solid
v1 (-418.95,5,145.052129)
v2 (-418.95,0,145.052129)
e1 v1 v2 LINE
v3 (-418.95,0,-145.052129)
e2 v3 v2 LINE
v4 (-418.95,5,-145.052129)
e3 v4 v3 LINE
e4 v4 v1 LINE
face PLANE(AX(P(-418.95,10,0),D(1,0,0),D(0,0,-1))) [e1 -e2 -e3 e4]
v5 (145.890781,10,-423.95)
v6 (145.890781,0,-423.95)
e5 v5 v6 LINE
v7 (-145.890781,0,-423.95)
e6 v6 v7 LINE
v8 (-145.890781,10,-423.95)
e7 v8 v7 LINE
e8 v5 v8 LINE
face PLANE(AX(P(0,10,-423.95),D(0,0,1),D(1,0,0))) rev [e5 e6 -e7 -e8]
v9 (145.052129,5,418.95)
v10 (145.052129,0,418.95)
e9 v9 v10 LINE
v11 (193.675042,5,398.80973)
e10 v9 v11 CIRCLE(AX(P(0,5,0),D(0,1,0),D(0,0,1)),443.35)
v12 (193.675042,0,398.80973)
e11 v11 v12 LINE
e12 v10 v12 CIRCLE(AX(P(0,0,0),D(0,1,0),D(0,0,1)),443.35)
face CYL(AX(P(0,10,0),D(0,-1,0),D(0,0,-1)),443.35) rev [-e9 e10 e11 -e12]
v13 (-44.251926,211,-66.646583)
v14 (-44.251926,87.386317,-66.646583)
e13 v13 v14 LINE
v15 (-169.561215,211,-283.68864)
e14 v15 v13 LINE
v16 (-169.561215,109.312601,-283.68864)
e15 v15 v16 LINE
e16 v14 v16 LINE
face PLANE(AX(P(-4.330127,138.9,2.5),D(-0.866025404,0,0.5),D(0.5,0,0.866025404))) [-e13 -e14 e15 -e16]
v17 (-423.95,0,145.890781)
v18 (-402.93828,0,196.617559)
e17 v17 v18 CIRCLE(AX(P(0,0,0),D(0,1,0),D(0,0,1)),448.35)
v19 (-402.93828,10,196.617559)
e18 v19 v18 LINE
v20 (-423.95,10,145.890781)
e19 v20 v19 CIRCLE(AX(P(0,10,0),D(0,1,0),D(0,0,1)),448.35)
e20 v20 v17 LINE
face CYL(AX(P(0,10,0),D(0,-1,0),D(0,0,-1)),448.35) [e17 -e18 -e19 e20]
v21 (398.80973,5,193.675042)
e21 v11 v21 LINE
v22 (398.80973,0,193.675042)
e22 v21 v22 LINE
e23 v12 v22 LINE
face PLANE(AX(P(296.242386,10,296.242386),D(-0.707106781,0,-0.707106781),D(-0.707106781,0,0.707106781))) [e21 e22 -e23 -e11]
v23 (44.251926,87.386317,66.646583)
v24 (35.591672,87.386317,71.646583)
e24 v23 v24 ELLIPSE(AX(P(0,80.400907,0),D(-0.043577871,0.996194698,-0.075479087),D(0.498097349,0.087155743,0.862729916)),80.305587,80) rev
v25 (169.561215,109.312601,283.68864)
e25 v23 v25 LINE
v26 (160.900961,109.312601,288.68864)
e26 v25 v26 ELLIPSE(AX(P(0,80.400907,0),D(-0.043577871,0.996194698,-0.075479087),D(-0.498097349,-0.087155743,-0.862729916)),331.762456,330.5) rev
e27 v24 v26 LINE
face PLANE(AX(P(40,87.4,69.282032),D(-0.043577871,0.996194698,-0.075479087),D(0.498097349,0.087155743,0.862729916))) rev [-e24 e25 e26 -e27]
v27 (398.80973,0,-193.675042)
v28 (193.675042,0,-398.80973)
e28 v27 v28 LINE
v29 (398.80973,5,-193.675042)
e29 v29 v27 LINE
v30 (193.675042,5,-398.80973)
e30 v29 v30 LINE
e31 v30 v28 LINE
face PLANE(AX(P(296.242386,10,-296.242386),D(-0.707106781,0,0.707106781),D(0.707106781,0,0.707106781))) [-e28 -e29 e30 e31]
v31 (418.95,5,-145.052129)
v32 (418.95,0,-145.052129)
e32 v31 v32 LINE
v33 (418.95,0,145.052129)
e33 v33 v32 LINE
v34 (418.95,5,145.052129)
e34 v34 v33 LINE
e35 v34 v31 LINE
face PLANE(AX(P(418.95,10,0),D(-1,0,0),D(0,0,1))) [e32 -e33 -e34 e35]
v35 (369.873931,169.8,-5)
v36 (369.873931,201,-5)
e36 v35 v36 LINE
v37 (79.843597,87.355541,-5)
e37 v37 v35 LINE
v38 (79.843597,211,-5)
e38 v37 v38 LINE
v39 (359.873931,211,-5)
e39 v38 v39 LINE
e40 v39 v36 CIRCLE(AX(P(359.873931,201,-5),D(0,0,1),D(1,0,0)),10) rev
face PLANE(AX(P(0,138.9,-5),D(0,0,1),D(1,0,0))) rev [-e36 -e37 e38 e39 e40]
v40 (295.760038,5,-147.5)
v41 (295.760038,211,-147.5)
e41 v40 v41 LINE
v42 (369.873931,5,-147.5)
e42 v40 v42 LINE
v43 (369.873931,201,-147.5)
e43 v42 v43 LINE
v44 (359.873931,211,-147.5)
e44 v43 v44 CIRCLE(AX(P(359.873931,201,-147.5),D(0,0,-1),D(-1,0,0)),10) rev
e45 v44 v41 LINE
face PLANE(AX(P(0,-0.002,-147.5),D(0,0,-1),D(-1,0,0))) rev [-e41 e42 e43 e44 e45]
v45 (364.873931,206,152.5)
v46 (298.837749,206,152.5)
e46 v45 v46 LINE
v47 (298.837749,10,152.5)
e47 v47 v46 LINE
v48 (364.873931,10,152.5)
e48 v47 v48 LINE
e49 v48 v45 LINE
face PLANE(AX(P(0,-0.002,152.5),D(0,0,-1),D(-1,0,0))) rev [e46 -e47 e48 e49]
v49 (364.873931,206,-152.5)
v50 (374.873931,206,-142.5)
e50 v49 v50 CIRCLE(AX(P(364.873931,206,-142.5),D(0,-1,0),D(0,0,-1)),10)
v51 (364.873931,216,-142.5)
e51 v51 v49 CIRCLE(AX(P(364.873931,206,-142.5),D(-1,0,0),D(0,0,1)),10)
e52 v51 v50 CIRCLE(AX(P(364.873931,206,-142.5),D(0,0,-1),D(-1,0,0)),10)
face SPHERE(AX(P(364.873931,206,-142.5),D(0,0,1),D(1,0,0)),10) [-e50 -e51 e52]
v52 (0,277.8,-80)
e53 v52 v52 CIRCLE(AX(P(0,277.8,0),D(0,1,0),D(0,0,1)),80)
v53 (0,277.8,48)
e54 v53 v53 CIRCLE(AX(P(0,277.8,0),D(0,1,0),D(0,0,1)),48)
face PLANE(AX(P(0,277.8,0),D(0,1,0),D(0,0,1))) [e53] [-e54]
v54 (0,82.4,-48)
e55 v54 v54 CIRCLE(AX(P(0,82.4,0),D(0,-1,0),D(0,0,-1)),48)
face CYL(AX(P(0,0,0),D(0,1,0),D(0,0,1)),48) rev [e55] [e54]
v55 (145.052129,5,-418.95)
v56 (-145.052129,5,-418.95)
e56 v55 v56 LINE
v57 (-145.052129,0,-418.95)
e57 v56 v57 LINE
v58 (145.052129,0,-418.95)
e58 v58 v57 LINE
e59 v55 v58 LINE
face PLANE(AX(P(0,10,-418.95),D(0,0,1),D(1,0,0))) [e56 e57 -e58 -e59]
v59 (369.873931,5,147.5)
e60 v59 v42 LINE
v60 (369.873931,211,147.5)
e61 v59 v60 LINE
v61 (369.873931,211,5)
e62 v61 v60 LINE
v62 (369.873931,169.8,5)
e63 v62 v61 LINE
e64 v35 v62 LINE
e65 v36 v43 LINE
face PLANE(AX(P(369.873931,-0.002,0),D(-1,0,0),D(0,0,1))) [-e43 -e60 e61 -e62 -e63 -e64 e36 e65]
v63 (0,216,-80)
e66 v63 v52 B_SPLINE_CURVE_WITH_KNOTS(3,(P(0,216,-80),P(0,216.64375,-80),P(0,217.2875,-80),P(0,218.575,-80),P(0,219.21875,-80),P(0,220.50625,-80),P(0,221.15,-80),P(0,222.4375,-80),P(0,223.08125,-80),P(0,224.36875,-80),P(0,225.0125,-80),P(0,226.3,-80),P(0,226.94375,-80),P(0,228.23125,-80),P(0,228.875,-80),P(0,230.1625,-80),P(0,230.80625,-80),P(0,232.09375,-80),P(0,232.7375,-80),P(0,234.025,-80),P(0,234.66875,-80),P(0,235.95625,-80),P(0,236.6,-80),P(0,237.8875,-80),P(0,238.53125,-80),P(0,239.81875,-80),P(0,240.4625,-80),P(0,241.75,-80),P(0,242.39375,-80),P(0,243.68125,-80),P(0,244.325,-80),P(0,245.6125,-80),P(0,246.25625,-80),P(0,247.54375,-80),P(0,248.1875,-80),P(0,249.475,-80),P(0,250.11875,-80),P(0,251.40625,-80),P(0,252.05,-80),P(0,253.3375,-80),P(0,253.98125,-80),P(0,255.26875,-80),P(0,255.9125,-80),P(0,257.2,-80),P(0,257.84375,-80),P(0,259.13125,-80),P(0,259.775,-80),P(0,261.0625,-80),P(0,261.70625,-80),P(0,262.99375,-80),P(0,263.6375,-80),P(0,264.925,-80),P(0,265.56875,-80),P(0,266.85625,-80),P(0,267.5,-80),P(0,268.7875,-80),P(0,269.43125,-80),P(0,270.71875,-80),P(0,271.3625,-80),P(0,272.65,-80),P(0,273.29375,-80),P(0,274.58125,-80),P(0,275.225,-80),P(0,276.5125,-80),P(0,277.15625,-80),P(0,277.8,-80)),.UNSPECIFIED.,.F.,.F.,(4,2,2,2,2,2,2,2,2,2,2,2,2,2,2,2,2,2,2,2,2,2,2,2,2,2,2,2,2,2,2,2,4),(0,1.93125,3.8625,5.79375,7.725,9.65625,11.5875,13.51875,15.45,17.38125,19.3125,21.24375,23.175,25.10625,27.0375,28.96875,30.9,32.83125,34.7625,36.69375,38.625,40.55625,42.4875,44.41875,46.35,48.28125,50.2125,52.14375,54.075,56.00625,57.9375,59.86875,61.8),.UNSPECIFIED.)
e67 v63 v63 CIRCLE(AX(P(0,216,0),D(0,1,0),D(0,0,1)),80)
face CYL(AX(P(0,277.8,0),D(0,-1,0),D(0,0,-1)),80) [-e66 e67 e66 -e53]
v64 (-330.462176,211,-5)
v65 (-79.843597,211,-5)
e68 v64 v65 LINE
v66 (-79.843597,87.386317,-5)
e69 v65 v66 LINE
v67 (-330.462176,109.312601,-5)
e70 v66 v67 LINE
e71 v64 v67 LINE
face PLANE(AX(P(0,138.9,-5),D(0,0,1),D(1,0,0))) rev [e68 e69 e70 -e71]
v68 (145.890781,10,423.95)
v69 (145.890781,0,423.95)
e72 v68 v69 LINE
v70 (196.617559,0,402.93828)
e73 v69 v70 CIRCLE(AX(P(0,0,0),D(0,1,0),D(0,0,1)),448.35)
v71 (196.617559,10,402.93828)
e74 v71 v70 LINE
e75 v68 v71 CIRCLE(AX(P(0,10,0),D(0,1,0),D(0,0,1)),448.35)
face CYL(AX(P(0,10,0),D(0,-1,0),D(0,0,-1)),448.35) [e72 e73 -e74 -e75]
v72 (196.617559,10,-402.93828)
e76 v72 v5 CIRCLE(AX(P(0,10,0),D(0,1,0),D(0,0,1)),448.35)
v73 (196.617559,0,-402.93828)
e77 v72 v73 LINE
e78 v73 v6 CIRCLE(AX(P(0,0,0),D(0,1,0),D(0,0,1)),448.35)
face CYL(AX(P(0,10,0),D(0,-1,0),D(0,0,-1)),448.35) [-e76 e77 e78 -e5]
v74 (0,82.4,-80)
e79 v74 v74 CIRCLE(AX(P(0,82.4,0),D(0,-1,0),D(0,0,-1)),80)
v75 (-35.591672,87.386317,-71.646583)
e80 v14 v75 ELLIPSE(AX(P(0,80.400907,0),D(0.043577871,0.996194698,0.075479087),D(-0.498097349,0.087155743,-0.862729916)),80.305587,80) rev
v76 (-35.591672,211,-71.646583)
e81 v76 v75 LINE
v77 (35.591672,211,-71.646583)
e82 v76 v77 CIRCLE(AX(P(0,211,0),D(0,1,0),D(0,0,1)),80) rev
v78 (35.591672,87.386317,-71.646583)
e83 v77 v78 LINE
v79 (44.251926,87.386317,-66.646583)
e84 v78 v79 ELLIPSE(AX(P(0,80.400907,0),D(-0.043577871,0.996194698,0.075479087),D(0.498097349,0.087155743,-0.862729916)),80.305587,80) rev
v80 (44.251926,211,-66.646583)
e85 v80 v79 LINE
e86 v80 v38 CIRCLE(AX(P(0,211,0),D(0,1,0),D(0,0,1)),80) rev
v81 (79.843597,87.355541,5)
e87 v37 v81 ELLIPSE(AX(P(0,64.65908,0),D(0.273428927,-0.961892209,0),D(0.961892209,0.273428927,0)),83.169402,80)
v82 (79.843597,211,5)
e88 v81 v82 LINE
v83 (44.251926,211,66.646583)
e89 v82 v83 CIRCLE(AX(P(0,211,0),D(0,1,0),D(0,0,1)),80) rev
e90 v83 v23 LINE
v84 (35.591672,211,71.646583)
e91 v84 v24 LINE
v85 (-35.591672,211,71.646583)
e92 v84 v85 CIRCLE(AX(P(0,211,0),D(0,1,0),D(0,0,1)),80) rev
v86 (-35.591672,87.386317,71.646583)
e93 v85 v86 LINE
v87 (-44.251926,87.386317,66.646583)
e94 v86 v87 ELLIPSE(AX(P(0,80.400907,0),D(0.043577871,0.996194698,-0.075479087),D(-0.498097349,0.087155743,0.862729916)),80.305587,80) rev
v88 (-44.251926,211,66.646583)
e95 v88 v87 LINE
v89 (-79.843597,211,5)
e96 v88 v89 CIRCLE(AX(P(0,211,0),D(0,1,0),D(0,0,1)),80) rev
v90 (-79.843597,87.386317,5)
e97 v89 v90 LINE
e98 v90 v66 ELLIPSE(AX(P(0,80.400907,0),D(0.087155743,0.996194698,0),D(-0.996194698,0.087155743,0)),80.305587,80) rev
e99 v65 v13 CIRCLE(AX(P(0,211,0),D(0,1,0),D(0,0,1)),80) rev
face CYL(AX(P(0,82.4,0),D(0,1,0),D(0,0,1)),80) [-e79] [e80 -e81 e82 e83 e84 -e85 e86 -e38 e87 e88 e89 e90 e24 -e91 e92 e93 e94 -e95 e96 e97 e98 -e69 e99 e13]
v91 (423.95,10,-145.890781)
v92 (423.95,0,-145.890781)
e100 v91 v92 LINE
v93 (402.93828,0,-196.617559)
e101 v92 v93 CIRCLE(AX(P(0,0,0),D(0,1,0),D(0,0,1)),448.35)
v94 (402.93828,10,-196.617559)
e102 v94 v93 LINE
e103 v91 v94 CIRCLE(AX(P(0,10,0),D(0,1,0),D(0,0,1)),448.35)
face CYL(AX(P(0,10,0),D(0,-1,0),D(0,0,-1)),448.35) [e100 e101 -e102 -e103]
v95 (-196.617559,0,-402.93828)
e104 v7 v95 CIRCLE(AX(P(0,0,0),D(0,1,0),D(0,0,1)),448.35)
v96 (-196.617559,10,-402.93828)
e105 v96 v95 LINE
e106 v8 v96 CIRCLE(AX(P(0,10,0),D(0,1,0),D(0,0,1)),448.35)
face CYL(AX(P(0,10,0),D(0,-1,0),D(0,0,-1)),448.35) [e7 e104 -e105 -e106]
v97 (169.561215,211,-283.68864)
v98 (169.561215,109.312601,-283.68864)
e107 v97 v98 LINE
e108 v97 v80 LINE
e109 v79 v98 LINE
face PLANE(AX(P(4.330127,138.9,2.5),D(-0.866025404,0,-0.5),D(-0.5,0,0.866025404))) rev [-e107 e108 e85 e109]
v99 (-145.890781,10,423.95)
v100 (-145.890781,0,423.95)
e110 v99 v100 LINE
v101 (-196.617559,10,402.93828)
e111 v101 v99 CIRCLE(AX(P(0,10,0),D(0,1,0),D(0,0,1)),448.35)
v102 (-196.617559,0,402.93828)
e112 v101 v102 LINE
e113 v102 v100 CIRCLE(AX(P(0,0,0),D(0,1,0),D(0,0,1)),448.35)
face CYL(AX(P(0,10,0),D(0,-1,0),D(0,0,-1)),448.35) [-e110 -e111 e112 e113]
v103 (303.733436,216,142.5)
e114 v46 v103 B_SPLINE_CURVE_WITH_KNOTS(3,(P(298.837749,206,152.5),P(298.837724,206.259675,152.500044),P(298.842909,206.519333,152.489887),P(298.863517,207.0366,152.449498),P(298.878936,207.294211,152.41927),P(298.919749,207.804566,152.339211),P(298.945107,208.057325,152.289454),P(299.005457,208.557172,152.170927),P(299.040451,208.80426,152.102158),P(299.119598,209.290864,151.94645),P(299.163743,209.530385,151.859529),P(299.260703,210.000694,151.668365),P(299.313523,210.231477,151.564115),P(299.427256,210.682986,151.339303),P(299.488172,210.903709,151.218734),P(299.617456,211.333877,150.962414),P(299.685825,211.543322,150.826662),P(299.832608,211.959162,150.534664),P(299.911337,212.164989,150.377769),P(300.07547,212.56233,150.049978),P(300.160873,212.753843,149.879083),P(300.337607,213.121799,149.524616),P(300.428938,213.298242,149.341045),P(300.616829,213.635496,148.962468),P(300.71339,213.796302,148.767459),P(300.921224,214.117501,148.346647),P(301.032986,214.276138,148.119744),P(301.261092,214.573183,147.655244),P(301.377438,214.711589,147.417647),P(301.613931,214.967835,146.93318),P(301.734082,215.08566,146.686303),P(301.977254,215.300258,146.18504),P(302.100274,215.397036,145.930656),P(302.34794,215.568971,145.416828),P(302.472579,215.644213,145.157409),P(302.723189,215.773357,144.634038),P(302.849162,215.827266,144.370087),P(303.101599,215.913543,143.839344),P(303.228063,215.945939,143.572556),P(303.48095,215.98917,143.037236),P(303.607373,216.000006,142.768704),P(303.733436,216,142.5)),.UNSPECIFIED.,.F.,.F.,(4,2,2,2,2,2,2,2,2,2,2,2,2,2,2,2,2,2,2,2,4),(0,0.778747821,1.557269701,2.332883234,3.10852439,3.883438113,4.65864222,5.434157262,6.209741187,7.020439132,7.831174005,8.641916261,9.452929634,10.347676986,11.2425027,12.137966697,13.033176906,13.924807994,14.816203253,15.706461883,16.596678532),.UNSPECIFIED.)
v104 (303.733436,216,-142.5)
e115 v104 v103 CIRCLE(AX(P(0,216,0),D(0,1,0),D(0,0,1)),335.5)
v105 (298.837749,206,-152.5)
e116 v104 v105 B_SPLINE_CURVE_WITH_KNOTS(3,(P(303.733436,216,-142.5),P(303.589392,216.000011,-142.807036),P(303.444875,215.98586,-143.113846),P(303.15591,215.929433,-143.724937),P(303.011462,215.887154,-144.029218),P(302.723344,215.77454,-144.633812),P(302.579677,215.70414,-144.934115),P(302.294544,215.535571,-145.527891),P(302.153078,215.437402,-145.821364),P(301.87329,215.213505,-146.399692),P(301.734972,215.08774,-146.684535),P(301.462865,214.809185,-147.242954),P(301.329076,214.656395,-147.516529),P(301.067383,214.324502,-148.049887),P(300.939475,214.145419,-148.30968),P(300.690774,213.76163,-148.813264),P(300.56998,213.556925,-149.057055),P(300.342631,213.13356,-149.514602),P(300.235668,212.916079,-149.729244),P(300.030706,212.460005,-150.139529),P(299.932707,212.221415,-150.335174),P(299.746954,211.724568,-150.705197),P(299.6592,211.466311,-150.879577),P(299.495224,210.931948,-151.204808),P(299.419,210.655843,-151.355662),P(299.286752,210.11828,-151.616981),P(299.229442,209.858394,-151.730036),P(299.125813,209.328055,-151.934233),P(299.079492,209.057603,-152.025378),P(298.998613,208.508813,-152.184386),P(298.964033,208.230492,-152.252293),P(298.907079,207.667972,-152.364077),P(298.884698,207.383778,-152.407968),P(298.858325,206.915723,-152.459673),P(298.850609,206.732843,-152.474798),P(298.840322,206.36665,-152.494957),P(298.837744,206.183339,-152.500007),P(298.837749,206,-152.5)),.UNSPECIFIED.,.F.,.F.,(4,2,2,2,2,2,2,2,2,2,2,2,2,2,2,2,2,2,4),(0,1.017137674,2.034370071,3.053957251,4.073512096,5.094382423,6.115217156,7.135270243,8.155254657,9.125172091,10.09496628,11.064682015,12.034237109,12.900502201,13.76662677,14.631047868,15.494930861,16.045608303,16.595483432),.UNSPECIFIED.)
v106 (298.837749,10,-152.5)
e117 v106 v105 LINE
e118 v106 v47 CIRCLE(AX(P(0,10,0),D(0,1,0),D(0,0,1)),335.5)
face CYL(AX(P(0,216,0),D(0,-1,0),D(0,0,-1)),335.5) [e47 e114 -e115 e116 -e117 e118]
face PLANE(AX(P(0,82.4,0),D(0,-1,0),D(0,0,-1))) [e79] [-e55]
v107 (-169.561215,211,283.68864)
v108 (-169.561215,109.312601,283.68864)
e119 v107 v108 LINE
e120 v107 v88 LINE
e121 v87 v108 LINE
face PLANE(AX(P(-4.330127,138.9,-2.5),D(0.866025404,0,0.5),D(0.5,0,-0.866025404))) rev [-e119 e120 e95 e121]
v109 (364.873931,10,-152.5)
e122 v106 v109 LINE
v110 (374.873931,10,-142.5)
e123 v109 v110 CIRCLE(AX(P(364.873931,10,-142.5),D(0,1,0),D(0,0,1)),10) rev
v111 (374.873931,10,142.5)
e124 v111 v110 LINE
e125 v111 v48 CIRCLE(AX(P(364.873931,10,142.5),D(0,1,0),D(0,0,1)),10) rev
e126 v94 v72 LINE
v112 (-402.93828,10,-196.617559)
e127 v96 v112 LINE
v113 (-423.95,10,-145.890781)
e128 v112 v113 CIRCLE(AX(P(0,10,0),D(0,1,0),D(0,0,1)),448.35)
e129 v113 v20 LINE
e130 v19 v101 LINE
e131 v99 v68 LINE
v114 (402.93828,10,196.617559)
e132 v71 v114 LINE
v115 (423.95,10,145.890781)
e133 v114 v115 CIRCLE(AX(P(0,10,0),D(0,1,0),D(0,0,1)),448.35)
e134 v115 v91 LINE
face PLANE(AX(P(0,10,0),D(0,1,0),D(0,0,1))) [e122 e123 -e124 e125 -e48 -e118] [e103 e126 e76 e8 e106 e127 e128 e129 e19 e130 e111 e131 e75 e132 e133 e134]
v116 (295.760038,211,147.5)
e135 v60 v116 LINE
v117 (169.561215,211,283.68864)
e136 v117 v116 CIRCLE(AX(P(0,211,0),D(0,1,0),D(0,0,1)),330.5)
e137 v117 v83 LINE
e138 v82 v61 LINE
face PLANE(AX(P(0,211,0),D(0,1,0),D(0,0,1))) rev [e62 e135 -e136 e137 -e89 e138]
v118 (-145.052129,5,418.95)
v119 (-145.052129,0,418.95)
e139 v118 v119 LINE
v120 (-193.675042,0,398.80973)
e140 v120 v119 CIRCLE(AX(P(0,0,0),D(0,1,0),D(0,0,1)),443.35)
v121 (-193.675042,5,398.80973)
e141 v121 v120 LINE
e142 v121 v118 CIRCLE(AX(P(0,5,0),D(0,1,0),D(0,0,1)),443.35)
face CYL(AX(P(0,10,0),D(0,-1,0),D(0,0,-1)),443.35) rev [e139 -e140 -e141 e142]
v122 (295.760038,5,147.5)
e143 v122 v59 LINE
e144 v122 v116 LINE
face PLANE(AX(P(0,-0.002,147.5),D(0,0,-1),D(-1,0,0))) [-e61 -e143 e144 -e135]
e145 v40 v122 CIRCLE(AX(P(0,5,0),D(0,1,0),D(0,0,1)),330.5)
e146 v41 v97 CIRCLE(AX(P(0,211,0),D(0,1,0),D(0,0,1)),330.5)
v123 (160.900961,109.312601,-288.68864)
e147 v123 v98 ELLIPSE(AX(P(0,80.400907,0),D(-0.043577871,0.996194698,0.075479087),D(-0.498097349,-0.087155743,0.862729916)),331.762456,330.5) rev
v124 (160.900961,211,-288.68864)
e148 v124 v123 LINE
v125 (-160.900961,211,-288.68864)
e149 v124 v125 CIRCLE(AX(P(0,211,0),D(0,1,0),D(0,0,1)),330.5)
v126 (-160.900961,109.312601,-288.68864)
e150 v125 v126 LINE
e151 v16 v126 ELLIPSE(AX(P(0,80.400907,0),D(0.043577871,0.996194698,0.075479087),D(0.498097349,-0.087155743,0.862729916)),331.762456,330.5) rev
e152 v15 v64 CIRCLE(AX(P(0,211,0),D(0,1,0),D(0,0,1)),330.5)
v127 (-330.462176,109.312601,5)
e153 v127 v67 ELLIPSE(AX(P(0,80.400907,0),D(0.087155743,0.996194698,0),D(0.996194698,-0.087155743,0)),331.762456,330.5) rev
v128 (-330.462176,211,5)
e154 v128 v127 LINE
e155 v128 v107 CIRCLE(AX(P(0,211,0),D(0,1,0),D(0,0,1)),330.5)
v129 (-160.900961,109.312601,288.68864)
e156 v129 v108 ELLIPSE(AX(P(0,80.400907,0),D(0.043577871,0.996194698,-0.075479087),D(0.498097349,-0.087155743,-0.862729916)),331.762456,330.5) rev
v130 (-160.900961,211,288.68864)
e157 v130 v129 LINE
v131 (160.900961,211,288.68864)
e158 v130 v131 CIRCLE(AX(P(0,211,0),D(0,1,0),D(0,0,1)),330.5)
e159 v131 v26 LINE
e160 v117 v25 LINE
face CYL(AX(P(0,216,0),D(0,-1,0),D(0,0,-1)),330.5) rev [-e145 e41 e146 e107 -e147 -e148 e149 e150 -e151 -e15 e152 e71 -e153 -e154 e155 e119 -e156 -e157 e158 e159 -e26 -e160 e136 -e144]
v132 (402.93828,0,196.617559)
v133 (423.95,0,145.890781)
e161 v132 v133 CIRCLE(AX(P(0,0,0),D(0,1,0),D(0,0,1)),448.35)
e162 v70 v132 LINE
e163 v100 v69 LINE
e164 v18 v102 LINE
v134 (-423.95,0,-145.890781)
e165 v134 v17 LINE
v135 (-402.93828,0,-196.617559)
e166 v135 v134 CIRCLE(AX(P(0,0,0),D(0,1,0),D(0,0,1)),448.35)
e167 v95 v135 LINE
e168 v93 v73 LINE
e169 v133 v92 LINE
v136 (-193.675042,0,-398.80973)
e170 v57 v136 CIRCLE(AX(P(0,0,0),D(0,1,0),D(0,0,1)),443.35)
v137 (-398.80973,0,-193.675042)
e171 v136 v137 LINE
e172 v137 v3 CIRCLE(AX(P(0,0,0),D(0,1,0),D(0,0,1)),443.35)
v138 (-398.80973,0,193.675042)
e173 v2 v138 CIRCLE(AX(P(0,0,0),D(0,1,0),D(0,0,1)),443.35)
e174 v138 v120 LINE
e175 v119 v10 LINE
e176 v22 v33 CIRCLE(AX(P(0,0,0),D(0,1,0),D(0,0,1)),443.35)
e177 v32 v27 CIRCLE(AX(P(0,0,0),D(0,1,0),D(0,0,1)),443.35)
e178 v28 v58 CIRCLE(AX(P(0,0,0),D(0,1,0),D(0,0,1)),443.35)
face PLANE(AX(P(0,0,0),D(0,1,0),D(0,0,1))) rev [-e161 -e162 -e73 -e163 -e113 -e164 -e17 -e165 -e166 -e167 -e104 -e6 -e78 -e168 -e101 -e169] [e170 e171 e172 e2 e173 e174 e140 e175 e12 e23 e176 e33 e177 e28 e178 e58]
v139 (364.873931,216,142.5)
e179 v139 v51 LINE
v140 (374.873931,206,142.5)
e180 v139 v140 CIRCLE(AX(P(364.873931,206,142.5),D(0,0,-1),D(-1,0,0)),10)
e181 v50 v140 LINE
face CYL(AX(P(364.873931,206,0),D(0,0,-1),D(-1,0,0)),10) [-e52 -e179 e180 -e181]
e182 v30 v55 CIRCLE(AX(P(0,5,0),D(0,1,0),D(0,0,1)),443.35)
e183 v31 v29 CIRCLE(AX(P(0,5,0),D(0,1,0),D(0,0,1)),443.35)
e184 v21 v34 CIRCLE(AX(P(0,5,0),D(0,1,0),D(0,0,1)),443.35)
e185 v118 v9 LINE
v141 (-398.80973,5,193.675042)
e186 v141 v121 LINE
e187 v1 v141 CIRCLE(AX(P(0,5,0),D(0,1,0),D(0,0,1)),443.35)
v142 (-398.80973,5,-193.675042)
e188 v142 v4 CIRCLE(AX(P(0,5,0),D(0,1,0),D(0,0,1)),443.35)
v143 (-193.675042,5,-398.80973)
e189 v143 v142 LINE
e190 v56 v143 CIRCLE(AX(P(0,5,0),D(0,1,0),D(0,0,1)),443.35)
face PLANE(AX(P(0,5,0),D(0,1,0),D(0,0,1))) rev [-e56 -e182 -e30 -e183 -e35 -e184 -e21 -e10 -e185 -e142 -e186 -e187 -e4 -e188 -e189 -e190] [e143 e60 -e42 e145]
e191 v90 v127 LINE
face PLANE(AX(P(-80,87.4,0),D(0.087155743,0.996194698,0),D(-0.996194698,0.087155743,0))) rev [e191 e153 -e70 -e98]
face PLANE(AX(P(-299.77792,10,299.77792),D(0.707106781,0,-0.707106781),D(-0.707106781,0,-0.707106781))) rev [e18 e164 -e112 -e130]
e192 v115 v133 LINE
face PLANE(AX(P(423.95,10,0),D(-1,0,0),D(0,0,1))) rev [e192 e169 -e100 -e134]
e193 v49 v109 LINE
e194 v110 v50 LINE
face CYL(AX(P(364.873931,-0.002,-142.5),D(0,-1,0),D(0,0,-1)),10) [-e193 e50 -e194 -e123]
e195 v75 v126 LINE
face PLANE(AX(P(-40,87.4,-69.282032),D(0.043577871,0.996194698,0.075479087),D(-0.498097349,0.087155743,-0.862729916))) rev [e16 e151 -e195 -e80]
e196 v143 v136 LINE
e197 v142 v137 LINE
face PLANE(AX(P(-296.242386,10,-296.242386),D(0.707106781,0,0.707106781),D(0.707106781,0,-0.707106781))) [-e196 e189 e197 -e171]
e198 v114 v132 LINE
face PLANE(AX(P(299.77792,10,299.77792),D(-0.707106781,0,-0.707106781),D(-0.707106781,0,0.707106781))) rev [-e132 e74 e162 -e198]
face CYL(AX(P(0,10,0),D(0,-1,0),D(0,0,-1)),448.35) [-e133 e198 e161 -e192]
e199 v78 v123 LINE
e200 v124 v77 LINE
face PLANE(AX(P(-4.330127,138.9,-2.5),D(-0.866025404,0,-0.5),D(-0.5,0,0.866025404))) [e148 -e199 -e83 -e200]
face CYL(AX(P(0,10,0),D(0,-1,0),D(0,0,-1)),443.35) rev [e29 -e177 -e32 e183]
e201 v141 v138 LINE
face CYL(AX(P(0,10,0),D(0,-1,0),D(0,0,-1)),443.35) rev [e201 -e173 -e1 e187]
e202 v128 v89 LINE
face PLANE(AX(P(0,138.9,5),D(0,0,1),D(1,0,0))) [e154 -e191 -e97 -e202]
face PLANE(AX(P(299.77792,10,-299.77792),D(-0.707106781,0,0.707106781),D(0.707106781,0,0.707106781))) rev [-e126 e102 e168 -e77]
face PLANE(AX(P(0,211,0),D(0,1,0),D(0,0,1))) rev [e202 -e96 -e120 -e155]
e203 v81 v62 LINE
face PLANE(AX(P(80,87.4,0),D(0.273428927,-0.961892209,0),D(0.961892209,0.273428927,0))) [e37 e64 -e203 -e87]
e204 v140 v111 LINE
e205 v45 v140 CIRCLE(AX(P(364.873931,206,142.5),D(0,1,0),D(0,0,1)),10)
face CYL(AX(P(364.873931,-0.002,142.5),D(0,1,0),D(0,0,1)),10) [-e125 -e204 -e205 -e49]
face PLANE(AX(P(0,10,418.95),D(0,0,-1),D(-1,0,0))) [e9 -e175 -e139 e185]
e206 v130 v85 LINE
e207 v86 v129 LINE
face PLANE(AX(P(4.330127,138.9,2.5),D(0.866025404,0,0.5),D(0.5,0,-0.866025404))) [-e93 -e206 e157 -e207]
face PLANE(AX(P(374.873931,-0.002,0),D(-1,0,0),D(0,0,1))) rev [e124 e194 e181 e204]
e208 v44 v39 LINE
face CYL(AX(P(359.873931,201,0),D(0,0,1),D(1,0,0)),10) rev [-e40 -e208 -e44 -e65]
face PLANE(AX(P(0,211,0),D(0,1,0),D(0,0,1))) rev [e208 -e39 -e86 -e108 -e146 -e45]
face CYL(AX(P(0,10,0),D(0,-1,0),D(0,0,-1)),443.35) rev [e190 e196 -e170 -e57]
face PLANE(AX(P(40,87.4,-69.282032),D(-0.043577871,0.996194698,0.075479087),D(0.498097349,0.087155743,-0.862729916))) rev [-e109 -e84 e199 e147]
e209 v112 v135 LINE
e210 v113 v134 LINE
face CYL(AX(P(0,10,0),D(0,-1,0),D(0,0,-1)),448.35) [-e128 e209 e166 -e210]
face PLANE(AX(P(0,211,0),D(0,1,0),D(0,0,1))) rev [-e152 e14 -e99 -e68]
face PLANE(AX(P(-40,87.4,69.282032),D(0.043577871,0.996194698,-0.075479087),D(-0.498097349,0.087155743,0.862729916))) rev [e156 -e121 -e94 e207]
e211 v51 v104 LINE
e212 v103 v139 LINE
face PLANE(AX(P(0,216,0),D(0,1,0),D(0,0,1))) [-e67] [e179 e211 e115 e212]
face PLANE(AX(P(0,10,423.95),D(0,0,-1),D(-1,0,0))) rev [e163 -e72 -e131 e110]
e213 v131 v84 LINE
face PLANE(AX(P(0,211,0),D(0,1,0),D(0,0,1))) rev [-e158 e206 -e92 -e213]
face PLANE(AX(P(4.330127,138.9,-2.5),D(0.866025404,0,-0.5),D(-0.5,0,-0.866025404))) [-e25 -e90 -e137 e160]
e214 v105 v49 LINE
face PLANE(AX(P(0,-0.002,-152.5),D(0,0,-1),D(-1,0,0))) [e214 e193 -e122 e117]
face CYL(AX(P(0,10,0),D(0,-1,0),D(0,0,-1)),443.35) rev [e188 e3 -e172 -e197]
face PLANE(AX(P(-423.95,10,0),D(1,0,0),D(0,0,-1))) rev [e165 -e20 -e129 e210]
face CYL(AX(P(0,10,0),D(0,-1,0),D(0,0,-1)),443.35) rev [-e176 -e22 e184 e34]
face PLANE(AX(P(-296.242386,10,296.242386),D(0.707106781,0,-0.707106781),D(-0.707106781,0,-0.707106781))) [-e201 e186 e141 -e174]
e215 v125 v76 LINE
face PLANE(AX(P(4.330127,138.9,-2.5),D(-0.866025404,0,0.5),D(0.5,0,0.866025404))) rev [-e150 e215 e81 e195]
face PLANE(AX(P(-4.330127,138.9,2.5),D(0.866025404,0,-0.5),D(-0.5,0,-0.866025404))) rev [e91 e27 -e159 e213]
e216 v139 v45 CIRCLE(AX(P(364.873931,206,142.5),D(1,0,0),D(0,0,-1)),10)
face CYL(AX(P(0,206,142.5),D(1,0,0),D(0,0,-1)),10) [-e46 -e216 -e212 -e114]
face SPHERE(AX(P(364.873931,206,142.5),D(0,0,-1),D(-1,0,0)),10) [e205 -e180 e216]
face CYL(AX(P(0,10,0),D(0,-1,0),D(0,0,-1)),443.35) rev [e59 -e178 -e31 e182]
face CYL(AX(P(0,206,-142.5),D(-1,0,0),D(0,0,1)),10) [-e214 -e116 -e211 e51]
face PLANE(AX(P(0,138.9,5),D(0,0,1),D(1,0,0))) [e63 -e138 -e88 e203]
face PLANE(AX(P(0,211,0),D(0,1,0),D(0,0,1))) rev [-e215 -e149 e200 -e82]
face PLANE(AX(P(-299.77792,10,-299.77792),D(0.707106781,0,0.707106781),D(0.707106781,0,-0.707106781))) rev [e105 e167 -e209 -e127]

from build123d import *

# Parameters (mm, degrees)
EXTRUDE_1_DEPTH          = 10
SKETCH_2_R               = 335.5
EXTRUDE_2_DEPTH          = 206
EXTRUDE_3_REACH          = 639.278
SHELL_1_T                = -5
SKETCH_4_R               = 80
EXTRUDE_4_DEPTH          = 61.8
EXTRUDE_START            = 128.6
SKETCH_5_R               = 80
EXTRUDE_5_DEPTH          = 128.6
SKETCH_7_R               = 48
CUT_EXTRUDE_1_DEPTH      = 661.787443131
RIB_START                = -5
RIB_2_DEPTH              = 10
PATTERN_CIRCULAR_2_COUNT = 6
RIB_9_REACH              = 662.787
SKETCH_13_WALL_W         = 1624.932905634
SKETCH_13_WALL_H         = 10
FILLET_1_R               = 10
FILLET_2_R               = 10
FILLET_3_R               = 10


# Read off the part's stored shape, not the designer's step: 筋2
with BuildPart() as part:
    # 草图1 → 凸台-拉伸1 (new body)
    with BuildSketch(Plane(origin=(0, 0, 0), x_dir=(1, 0, 0), z_dir=(0, 1, 0))):
        with BuildLine():
            ThreePointArc((145.890781066, -423.95), (171.576116901, -414.221388401), (196.61755928, -402.938280488))
            Line((196.61755928, -402.938280488), (402.938280488, -196.61755928))
            ThreePointArc((402.938280488, -196.61755928), (414.221388401, -171.576116901), (423.95, -145.890781066))
            Line((423.95, -145.890781066), (423.95, 145.890781066))
            ThreePointArc((423.95, 145.890781066), (414.221388401, 171.576116901), (402.938280488, 196.61755928))
            Line((402.938280488, 196.61755928), (196.61755928, 402.938280488))
            ThreePointArc((196.61755928, 402.938280488), (171.576116901, 414.221388401), (145.890781066, 423.95))
            Line((145.890781066, 423.95), (-145.890781066, 423.95))
            ThreePointArc((-145.890781066, 423.95), (-171.576116901, 414.221388401), (-196.61755928, 402.938280488))
            Line((-196.61755928, 402.938280488), (-402.938280488, 196.61755928))
            ThreePointArc((-402.938280488, 196.61755928), (-414.221388401, 171.576116901), (-423.95, 145.890781066))
            Line((-423.95, 145.890781066), (-423.95, -145.890781066))
            ThreePointArc((-423.95, -145.890781066), (-414.221388401, -171.576116901), (-402.938280488, -196.61755928))
            Line((-402.938280488, -196.61755928), (-196.61755928, -402.938280488))
            ThreePointArc((-196.61755928, -402.938280488), (-171.576116901, -414.221388401), (-145.890781066, -423.95))
            Line((-145.890781066, -423.95), (145.890781066, -423.95))
        make_face()
    extrude(amount=EXTRUDE_1_DEPTH)

    # 草图2 → 凸台-拉伸2 (add)
    with BuildSketch(Plane(origin=(0, 10, 0), x_dir=(1, 0, 0), z_dir=(0, 1, 0))):
        with Locations(Location((0, 0, 0), (0, 0, 270))):
            Circle(SKETCH_2_R)
    extrude(amount=EXTRUDE_2_DEPTH)

    # 草图3 → 凸台-拉伸3 (add, up to next)
    with BuildSketch(Plane(origin=(0, 216, 0), x_dir=(1, 0, 0), z_dir=(0, 1, 0)), mode=Mode.PRIVATE) as extrude_3_sk1:
        with BuildLine():
            ThreePointArc((298.83774862, 152.5), (326.205697882, 78.422526541), (335.5, 0))
            Line((335.5, 0), (374.873930941, 0))
            Line((374.873930941, 0), (374.873930941, 152.5))
            Line((374.873930941, 152.5), (298.83774862, 152.5))
        make_face()
    extrude_3_tool1 = extrude(extrude_3_sk1.sketch, amount=-EXTRUDE_3_REACH, mode=Mode.PRIVATE) - part.part
    # 草图3 → 凸台-拉伸3 (add, up to next)
    with BuildSketch(Plane(origin=(0, 216, 0), x_dir=(1, 0, 0), z_dir=(0, 1, 0)), mode=Mode.PRIVATE) as extrude_3_sk2:
        with BuildLine():
            Line((374.873930941, 0), (335.5, 0))
            ThreePointArc((335.5, 0), (326.205697882, -78.422526541), (298.83774862, -152.5))
            Line((298.83774862, -152.5), (374.873930941, -152.5))
            Line((374.873930941, -152.5), (374.873930941, 0))
        make_face()
    extrude_3_tool2 = extrude(extrude_3_sk2.sketch, amount=-EXTRUDE_3_REACH, mode=Mode.PRIVATE) - part.part
    add(extrude_3_tool1.solids().sort_by_distance((348.072526, 216, -85.221274))[0])
    add(extrude_3_tool2.solids().sort_by_distance((348.072526, 216, 85.221274))[0])

    # 抽壳1
    shell_1_openings = [part.faces().sort_by_distance(p)[0] for p in [
        (0, 0, 0),
    ]]
    offset(amount=SHELL_1_T, openings=shell_1_openings, kind=Kind.INTERSECTION)

    # 草图4 → 凸台-拉伸4 (add)
    with BuildSketch(Plane(origin=(0, 216, 0), x_dir=(1, 0, 0), z_dir=(0, 1, 0))):
        with Locations(Location((0, 0, 0), (0, 0, 90))):
            Circle(SKETCH_4_R)
    extrude(amount=EXTRUDE_4_DEPTH)

    # 草图5 → 凸台-拉伸5 (add)
    with BuildSketch(Plane.XZ.offset(-211).offset(EXTRUDE_START)):
        with Locations(Location((0, 0, 0), (0, 0, 270))):
            Circle(SKETCH_5_R)
    extrude(amount=-EXTRUDE_5_DEPTH)

    # 草图7 → 切除-拉伸1 (cut, through all)
    with BuildSketch(Plane(origin=(0, 277.8, 0), x_dir=(1, 0, 0), z_dir=(0, 1, 0))):
        with Locations(Location((0, 0, 0), (0, 0, 270))):
            Circle(SKETCH_7_R)
    extrude(amount=-CUT_EXTRUDE_1_DEPTH, mode=Mode.SUBTRACT)

    # 筋2 outline → 筋2 (add)
    with BuildSketch(Plane.XY.offset(RIB_START)):
        Polygon((-330.5, 109.315910213), (-79.843597113, 87.38631652), (-78, 87.225022673), (-78, 211), (-332, 211), (-332, 109.447143208), align=None)
    rib_2 = extrude(amount=RIB_2_DEPTH)

    # 阵列(圆周)2: 筋2 ×6 about axis, 1 skipped
    pattern_circular_2_axis = Axis((0, 0, 0), (0, 1, 0))
    add([rib_2.rotate(pattern_circular_2_axis, i * 360 / PATTERN_CIRCULAR_2_COUNT) for i in range(1, PATTERN_CIRCULAR_2_COUNT) if i not in (3,)])

    # 草图13 wall → 筋9 (add, up to next)
    with BuildSketch(Plane(origin=(224.936965471, 128.6, 0), x_dir=(0.961892208962, 0.2734289274, 0), z_dir=(-0.2734289274, 0.961892208962, 0)), mode=Mode.PRIVATE) as rib_9_sk1:
        Rectangle(SKETCH_13_WALL_W, SKETCH_13_WALL_H)
    rib_9_tool1 = extrude(rib_9_sk1.sketch, amount=RIB_9_REACH, mode=Mode.PRIVATE) - part.part
    add(rib_9_tool1.solids().sort_by_distance((224.936965471, 128.6, 0))[0])

    # 圆角1
    fillet_1_edges = [part.edges().sort_by_distance(p)[0] for p in [
        (374.873930941, 113, -152.5),
        (336.85583978, 216, -152.5),
    ]]
    fillet(fillet_1_edges, radius=FILLET_1_R)

    # 圆角2
    # the kernel refuses this fillet: 10 mm, written as the material it adds along each edge
    with BuildSketch(Plane(origin=(369.873930941, 211, -5), x_dir=(-1, 0, 0), z_dir=(0, 0, -1))) as fillet_2_piece_1:
        with BuildLine():
            CenterArc((FILLET_2_R, -FILLET_2_R), FILLET_2_R, 90, 90)
            Line((0, -FILLET_2_R), (0, 0))
            Line((0, 0), (FILLET_2_R, 0))
        make_face()
    extrude(amount=142.5)
    # the kernel refuses this fillet: 10 mm, written as the material it takes off along each edge
    with BuildSketch(Plane(origin=(364.873930941, 206, -142.5), x_dir=(0, 1, 0), z_dir=(1, 0, 0))) as fillet_2_2_piece_1_section:
        Polygon((0, 0), (FILLET_2_R * 1.02, 0), (FILLET_2_R * 1.02, -FILLET_2_R * 1.02), (0, -FILLET_2_R * 1.02), align=None)
    fillet_2_2_piece_1 = extrude(amount=FILLET_2_R * 1.02, mode=Mode.PRIVATE)
    fillet_2_2_piece_1 = fillet_2_2_piece_1 - Plane(origin=(364.873930941, 206, -142.5), x_dir=(0, -0.7071067811865475, 0.7071067811865475), z_dir=(1, 0, 0)) * Sphere(FILLET_2_R, mode=Mode.PRIVATE)
    add(fillet_2_2_piece_1, mode=Mode.SUBTRACT)
    with BuildSketch(Plane(origin=(374.873930941, 216, -142.5), x_dir=(0, -1, 0), z_dir=(0, 0, 1))) as fillet_2_2_piece_2:
        with BuildLine():
            CenterArc((FILLET_2_R, -FILLET_2_R), FILLET_2_R, 90, 90)
            Line((0, -FILLET_2_R), (0, 0))
            Line((0, 0), (FILLET_2_R, 0))
        make_face()
    extrude(amount=320, mode=Mode.SUBTRACT)

    # 圆角3
    fillet_3_edges = [part.edges().sort_by_distance(p)[0] for p in [
        (331.85583978, 216, 152.5),
        (371.944998753, 213.071067812, 152.5),
        (374.873930941, 108, 152.5),
    ]]
    fillet(fillet_3_edges, radius=FILLET_3_R)


solid = part.part
